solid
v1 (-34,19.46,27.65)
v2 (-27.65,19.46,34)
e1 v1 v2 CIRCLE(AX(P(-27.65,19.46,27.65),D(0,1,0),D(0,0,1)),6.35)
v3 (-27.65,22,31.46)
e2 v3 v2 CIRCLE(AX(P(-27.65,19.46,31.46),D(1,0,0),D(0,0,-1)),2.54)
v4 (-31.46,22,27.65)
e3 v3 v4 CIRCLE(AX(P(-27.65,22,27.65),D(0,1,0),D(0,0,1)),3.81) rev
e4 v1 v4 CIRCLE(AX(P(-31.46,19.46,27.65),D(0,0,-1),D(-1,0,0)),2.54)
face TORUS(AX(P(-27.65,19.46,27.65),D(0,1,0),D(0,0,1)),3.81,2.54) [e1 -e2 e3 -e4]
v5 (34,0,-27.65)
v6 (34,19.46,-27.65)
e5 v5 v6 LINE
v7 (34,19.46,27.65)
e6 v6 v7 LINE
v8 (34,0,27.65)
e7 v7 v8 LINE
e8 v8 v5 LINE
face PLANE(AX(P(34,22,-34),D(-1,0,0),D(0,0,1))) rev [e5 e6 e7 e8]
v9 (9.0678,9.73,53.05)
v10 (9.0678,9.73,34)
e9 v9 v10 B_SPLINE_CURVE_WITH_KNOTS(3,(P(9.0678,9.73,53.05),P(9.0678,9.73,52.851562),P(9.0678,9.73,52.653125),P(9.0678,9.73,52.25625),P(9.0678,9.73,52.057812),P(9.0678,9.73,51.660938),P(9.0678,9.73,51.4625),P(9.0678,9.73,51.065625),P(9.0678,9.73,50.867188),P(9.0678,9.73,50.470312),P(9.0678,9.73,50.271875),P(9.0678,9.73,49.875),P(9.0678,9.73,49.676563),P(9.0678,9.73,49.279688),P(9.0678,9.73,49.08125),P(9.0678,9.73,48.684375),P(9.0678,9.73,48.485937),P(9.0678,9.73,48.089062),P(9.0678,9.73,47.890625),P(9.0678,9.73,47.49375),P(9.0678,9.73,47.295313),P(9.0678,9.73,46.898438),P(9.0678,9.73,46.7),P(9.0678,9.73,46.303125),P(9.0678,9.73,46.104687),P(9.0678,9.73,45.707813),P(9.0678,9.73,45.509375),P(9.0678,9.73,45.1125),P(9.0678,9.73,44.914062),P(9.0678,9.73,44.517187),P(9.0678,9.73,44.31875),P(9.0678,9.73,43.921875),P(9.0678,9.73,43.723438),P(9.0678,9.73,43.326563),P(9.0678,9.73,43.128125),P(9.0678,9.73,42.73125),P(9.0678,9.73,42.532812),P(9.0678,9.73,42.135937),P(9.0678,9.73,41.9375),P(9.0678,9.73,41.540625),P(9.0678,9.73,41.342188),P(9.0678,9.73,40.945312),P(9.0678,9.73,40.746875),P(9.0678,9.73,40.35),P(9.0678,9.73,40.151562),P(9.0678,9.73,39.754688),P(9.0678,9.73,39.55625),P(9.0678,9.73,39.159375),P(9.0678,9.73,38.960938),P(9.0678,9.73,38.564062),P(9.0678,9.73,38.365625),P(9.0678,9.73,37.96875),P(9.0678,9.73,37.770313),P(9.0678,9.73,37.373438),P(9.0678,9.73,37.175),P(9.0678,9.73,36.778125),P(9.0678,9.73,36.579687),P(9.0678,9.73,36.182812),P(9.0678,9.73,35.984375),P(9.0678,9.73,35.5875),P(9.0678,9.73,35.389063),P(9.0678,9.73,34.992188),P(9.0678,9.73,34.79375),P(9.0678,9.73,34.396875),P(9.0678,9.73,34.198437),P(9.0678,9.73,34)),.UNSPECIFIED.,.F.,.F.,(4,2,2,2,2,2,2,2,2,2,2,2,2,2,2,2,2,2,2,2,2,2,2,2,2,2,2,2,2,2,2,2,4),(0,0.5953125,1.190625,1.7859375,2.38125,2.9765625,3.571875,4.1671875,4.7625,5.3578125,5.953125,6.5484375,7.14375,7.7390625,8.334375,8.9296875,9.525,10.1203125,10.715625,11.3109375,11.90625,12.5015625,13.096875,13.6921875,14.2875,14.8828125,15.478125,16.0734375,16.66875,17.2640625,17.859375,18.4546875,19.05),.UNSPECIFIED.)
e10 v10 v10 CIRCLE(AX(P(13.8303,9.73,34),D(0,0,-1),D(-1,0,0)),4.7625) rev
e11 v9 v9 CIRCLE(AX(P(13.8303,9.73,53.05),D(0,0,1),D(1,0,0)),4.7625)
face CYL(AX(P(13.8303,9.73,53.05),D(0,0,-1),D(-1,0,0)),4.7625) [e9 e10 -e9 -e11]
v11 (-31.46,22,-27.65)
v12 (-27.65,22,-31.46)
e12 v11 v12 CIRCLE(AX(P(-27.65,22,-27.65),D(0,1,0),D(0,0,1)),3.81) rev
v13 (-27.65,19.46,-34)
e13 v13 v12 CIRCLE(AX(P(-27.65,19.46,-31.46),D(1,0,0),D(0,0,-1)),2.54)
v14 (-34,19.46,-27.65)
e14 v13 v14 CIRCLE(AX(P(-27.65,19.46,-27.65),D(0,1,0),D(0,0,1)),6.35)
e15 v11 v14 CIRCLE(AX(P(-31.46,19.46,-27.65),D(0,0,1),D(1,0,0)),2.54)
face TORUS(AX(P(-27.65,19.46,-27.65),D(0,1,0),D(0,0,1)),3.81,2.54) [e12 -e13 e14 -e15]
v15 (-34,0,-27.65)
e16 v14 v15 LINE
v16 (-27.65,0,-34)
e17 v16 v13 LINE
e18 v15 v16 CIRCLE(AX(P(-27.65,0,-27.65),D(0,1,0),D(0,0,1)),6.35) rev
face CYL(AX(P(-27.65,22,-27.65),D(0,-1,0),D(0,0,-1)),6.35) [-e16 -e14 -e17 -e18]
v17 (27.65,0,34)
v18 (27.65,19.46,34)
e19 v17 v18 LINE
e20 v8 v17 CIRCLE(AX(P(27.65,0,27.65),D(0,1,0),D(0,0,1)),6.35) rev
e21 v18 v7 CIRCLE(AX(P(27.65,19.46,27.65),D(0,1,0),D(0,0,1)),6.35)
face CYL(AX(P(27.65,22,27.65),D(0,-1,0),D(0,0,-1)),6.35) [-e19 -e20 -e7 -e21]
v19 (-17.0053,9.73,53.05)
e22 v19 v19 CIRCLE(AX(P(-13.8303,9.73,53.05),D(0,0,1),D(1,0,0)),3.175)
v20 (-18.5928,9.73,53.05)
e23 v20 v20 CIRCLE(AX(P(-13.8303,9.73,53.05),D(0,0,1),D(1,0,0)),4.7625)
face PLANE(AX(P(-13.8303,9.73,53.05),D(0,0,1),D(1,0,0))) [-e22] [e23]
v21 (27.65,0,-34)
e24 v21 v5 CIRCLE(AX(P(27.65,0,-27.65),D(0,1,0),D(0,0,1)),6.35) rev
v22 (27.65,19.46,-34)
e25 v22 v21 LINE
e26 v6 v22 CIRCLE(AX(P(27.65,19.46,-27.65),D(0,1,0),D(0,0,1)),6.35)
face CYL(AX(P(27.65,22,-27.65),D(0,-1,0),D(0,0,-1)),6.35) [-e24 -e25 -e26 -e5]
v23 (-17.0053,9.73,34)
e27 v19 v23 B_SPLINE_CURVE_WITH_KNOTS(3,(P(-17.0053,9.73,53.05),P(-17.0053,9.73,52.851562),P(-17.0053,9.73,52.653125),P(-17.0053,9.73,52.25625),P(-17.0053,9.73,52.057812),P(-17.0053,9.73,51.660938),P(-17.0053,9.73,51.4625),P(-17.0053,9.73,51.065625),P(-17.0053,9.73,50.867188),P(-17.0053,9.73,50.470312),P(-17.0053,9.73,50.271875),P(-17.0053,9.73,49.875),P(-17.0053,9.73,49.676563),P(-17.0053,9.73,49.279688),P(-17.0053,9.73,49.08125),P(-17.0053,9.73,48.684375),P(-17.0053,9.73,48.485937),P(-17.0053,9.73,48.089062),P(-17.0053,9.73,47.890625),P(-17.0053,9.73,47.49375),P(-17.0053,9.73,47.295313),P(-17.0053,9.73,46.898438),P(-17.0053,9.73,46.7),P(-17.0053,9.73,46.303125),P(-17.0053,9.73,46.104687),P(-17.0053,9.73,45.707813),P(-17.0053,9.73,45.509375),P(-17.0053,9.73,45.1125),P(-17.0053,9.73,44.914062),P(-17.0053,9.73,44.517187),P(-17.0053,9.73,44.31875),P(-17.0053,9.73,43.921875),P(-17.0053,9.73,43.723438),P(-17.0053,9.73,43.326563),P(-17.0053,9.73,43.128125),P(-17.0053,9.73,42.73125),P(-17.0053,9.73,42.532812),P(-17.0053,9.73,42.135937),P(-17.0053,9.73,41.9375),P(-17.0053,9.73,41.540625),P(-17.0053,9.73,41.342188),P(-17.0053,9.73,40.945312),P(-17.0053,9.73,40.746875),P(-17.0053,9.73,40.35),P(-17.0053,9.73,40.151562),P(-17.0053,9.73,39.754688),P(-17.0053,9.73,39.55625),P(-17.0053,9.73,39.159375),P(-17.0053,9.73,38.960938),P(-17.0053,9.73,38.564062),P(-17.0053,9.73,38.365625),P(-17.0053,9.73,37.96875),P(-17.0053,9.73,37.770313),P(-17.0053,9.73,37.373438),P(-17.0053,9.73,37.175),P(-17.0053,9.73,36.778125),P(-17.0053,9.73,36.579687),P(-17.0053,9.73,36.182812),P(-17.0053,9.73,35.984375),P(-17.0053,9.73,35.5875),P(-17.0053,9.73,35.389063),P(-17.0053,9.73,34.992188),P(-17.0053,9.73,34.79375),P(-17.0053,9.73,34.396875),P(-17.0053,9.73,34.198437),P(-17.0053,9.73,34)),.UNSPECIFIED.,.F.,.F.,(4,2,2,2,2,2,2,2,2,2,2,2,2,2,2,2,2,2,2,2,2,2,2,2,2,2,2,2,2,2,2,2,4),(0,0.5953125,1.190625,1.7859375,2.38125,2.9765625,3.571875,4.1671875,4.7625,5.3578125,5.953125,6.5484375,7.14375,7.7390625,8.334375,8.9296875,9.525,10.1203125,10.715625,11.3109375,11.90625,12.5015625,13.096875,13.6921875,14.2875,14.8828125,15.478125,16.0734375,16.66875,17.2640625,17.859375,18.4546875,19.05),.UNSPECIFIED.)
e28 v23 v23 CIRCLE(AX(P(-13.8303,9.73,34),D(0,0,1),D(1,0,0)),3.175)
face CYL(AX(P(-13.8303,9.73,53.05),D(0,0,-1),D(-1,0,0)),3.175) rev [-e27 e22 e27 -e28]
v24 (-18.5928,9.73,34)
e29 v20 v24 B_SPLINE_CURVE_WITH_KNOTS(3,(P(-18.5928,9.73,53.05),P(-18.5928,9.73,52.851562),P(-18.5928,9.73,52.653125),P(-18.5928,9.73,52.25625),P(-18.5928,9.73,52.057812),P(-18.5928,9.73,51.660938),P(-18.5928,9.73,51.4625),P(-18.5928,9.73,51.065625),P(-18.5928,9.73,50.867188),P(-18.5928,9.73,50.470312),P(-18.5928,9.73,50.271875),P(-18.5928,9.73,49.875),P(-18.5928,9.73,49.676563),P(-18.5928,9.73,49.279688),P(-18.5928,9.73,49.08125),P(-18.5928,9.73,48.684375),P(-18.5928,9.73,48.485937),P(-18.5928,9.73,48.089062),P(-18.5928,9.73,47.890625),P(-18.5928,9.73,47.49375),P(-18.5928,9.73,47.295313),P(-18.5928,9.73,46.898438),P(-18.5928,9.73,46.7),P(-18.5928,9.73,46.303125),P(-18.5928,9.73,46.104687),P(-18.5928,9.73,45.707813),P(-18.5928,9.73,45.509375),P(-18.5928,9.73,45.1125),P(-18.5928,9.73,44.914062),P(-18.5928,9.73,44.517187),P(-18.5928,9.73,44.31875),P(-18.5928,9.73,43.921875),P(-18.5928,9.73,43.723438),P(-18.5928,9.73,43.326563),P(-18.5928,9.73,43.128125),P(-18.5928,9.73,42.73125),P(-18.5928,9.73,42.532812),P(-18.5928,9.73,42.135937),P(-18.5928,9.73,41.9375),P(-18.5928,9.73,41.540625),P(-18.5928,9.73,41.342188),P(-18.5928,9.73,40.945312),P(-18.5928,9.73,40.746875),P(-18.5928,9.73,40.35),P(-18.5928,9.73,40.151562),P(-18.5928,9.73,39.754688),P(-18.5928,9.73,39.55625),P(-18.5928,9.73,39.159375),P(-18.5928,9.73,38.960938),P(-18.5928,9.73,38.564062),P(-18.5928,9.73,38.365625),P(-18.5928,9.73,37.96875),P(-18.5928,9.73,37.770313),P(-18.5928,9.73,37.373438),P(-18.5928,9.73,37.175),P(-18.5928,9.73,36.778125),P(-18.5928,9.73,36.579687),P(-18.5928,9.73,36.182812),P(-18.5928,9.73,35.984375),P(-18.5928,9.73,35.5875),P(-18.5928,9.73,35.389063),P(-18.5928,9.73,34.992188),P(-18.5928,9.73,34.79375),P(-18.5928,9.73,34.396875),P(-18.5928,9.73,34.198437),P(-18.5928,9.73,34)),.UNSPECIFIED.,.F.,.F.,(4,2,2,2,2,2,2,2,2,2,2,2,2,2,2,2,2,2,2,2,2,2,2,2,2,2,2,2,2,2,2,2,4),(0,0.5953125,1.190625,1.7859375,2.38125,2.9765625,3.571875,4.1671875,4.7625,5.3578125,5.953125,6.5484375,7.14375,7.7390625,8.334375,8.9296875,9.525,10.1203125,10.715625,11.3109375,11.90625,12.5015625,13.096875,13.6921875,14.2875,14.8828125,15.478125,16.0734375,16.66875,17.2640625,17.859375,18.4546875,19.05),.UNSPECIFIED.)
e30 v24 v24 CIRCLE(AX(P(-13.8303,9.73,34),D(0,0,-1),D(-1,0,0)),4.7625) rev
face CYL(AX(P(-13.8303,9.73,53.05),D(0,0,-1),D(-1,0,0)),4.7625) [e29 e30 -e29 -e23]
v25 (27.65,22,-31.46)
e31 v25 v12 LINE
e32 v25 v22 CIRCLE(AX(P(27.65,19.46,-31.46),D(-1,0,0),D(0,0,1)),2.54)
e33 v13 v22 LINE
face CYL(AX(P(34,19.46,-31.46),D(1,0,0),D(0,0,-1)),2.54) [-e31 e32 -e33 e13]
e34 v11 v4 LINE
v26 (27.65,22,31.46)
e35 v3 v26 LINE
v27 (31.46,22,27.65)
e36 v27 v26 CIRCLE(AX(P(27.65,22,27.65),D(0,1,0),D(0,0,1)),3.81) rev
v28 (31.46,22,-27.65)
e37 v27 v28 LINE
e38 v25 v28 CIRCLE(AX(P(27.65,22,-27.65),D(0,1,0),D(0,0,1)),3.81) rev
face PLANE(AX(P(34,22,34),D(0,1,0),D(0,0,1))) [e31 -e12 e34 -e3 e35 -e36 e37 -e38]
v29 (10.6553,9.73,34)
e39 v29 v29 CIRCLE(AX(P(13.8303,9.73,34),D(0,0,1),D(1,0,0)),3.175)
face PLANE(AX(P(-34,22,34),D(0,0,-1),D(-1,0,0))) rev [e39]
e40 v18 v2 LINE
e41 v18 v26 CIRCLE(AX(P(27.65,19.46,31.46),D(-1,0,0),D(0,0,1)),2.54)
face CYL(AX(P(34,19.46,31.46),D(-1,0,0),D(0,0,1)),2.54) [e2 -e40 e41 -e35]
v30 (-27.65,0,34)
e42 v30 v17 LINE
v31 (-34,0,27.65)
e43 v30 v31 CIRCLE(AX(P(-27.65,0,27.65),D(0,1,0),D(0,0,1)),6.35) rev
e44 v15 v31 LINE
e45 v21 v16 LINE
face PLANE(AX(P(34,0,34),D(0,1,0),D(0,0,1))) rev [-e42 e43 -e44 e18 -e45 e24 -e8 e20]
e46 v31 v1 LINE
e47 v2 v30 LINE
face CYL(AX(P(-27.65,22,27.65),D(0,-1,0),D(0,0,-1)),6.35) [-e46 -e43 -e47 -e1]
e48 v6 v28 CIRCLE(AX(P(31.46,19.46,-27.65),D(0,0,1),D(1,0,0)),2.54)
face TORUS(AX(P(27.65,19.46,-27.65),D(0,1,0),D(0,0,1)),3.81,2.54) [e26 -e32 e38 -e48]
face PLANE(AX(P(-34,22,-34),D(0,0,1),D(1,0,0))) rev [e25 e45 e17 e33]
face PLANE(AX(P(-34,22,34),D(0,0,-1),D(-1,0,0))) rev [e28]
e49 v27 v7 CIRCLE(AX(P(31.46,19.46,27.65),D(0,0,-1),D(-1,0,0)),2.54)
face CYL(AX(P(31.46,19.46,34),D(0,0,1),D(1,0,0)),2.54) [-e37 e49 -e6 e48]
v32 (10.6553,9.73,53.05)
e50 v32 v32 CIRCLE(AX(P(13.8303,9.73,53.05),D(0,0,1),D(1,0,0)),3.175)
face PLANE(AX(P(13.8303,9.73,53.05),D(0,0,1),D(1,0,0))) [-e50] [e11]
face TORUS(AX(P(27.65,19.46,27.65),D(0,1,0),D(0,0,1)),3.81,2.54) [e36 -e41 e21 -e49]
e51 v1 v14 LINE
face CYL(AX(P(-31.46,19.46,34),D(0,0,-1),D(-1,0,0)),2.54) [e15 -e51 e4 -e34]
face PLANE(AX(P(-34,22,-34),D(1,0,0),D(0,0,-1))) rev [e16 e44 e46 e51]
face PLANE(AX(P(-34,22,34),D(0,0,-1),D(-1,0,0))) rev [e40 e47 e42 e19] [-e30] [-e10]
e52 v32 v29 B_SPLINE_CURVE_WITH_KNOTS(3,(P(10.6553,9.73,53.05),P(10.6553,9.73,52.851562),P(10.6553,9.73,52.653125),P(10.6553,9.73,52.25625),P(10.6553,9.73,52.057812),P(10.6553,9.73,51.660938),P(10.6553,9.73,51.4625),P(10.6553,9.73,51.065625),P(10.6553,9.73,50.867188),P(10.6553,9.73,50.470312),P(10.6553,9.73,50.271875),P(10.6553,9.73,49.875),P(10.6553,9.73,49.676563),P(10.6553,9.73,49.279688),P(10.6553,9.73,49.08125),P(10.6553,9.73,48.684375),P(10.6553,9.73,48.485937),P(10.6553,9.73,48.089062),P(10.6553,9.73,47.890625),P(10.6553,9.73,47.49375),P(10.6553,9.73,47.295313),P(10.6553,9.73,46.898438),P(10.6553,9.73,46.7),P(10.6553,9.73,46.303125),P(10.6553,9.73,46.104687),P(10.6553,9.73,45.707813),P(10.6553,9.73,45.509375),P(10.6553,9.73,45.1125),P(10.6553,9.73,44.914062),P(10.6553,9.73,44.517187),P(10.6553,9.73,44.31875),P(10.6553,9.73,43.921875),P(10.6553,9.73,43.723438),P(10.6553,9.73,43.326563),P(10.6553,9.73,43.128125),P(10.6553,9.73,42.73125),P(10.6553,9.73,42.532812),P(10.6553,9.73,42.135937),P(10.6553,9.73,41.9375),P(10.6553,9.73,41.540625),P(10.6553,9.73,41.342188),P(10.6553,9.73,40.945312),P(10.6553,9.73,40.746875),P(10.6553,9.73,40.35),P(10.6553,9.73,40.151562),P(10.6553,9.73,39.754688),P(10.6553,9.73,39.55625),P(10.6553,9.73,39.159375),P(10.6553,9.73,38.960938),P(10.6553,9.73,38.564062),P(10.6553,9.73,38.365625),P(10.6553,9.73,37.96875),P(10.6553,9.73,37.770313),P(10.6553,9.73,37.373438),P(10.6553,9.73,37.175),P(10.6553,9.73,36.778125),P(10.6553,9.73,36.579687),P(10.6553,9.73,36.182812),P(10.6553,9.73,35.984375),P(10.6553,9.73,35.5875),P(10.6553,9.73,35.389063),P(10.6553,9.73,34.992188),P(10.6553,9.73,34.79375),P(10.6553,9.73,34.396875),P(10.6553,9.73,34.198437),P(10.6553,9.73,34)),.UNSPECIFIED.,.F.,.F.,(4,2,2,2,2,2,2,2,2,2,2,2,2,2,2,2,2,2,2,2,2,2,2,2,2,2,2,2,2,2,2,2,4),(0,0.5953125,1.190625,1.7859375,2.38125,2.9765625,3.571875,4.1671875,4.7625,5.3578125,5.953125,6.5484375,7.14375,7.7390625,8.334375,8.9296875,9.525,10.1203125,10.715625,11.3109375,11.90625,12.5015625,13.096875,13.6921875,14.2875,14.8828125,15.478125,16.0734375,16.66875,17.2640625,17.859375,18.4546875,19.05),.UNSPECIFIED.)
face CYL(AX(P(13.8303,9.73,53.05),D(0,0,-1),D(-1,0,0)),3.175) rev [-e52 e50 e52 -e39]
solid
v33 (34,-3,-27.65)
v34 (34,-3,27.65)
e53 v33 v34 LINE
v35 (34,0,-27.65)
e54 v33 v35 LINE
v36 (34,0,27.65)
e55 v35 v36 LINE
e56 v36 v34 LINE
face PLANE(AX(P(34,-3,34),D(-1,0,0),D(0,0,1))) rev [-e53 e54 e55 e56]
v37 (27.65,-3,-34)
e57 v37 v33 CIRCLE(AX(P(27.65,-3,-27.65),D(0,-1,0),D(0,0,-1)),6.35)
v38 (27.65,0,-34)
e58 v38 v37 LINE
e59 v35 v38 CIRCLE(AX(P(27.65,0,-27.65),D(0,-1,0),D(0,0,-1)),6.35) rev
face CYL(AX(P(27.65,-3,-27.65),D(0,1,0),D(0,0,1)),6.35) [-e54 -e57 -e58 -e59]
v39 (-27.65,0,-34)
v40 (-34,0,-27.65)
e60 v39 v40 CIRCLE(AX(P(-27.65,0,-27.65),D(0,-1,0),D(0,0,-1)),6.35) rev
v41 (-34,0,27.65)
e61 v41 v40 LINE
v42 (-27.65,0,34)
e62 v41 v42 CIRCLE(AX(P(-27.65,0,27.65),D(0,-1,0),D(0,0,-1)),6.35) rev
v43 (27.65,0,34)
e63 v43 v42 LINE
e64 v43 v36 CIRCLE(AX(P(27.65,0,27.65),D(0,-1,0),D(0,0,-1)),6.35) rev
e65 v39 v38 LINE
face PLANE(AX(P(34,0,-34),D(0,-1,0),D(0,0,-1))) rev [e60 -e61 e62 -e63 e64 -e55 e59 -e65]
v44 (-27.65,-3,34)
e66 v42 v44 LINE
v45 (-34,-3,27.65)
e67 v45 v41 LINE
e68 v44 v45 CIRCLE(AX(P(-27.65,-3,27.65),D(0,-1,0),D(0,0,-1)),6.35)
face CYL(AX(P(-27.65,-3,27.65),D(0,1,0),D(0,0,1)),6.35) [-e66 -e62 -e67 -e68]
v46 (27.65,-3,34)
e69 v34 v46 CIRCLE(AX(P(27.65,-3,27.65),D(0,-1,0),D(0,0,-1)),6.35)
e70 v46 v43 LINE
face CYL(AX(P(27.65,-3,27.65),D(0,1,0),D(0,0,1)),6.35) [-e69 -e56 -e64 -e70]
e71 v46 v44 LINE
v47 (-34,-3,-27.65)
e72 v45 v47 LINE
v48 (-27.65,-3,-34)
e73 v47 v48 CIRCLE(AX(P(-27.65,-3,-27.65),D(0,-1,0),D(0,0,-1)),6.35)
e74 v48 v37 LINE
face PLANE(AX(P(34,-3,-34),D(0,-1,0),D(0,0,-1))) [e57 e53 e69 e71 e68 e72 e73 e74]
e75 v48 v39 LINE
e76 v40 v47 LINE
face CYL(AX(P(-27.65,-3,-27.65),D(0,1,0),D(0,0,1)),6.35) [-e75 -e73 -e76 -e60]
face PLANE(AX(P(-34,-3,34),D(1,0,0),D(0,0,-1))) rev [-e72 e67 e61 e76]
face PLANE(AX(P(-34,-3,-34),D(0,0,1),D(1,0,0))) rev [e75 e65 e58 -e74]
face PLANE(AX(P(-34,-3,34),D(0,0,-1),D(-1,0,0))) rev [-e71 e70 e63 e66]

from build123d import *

# Parameters (mm, degrees)
SKETCH1_W           = 68
SKETCH1_H           = 68
BOSS_EXTRUDE1_DEPTH = 22
FILLET1_R           = 2.54
FILLET2_R           = 6.35
SKETCH2_R           = 4.7625
SKETCH2_R_2         = 3.175
BOSS_EXTRUDE2_DEPTH = 19.05
SKETCH3_W           = 68
SKETCH3_H           = 68
BOSS_EXTRUDE3_DEPTH = 3
FILLET3_R           = 6.35


with BuildPart() as part:
    # Sketch1 → Boss-Extrude1 (new body)
    with BuildSketch(Plane(origin=(0, 0, 0), x_dir=(1, 0, 0), z_dir=(0, 1, 0))):
        Rectangle(SKETCH1_W, SKETCH1_H)
    extrude(amount=BOSS_EXTRUDE1_DEPTH)

    # Fillet1
    fillet1_edges = [part.edges().sort_by_distance(p)[0] for p in [
        (-34, 22, 0),
        (0, 22, 34),
        (34, 22, 0),
        (0, 22, -34),
    ]]
    fillet(fillet1_edges, radius=FILLET1_R)

    # Fillet2
    # the kernel refuses this fillet: 6.35 mm, written as the material it takes off along each edge
    with BuildSketch(Plane(origin=(27.65, 22, -27.65), x_dir=(1, 0, 0), z_dir=(0, 0, 1))) as fillet2_piece_1:
        with BuildLine():
            CenterArc((3.81, -2.54), 2.54, 0, 90)
            Line((6.35, -2.54), (6.35, 0))
            Line((6.35, 0), (3.81, 0))
        make_face()
    revolve(axis=Axis((27.65, 22, -27.65), (0, 1, 0)), revolution_arc=90, mode=Mode.SUBTRACT)
    with BuildSketch(Plane(origin=(27.65, 22, 27.65), x_dir=(0, 0, 1), z_dir=(-1, 0, 0))) as fillet2_piece_2:
        with BuildLine():
            CenterArc((3.81, -2.54), 2.54, 0, 90)
            Line((6.35, -2.54), (6.35, 0))
            Line((6.35, 0), (3.81, 0))
        make_face()
    revolve(axis=Axis((27.65, 22, 27.65), (0, 1, 0)), revolution_arc=90, mode=Mode.SUBTRACT)
    with BuildSketch(Plane(origin=(-27.65, 22, -27.65), x_dir=(0, 0, -1), z_dir=(1, 0, 0))) as fillet2_piece_3:
        with BuildLine():
            CenterArc((3.81, -2.54), 2.54, 0, 90)
            Line((6.35, -2.54), (6.35, 0))
            Line((6.35, 0), (3.81, 0))
        make_face()
    revolve(axis=Axis((-27.65, 22, -27.65), (0, 1, 0)), revolution_arc=90, mode=Mode.SUBTRACT)
    with BuildSketch(Plane(origin=(-27.65, 22, 27.65), x_dir=(-1, 0, 0), z_dir=(0, 0, -1))) as fillet2_piece_4:
        with BuildLine():
            CenterArc((3.81, -2.54), 2.54, 0, 90)
            Line((6.35, -2.54), (6.35, 0))
            Line((6.35, 0), (3.81, 0))
        make_face()
    revolve(axis=Axis((-27.65, 22, 27.65), (0, 1, 0)), revolution_arc=90, mode=Mode.SUBTRACT)
    with BuildSketch(Plane(origin=(-34, -15.875, 34), x_dir=(0, 0, -1), z_dir=(0, 1, 0)), Plane(origin=(-34, -15.875, -34), x_dir=(1, 0, 0), z_dir=(0, 1, 0))) as fillet2_piece_5:
        with BuildLine():
            CenterArc((FILLET2_R, -FILLET2_R), FILLET2_R, 90, 90)
            Line((0, -FILLET2_R), (0, 0))
            Line((0, 0), (FILLET2_R, 0))
        make_face()
    extrude(amount=37.875, mode=Mode.SUBTRACT)
    with BuildSketch(Plane(origin=(34, -15.875, -34), x_dir=(-1, 0, 0), z_dir=(0, 1, 0)), Plane(origin=(34, -15.875, 34), x_dir=(0, 0, -1), z_dir=(0, 1, 0))) as fillet2_piece_6:
        with BuildLine():
            CenterArc((FILLET2_R, FILLET2_R), FILLET2_R, 180, 90)
            Line((0, FILLET2_R), (0, 0))
            Line((0, 0), (FILLET2_R, 0))
        make_face()
    extrude(amount=37.875, mode=Mode.SUBTRACT)

    # Sketch2 → Boss-Extrude2 (add)
    # profile 1 of 2: a face of its own
    with BuildSketch(Plane.XY.offset(34)):
        with Locations(Location((-13.8303, 9.73, 0), (0, 0, 180))):
            Circle(SKETCH2_R)
        with Locations(Location((-13.8303, 9.73, 0), (0, 0, 180))):
            Circle(SKETCH2_R_2, mode=Mode.SUBTRACT)
    # profile 2 of 2: a face of its own
    with BuildSketch(Plane.XY.offset(34)):
        with Locations(Location((13.8303, 9.73, 0), (0, 0, 180))):
            Circle(SKETCH2_R)
        with Locations(Location((13.8303, 9.73, 0), (0, 0, 180))):
            Circle(SKETCH2_R_2, mode=Mode.SUBTRACT)
    extrude(amount=BOSS_EXTRUDE2_DEPTH)


with BuildPart() as body_2:
    # Sketch3 → Boss-Extrude3 (new body)
    with BuildSketch(Plane.XZ):
        Rectangle(SKETCH3_W, SKETCH3_H)
    extrude(amount=BOSS_EXTRUDE3_DEPTH)

    # Fillet3
    fillet3_edges = [body_2.edges().sort_by_distance(p)[0] for p in [
        (34, -1.5, -34),
        (-34, -1.5, -34),
        (-34, -1.5, 34),
        (34, -1.5, 34),
    ]]
    fillet(fillet3_edges, radius=FILLET3_R)


solid = Compound([part.part, body_2.part])
